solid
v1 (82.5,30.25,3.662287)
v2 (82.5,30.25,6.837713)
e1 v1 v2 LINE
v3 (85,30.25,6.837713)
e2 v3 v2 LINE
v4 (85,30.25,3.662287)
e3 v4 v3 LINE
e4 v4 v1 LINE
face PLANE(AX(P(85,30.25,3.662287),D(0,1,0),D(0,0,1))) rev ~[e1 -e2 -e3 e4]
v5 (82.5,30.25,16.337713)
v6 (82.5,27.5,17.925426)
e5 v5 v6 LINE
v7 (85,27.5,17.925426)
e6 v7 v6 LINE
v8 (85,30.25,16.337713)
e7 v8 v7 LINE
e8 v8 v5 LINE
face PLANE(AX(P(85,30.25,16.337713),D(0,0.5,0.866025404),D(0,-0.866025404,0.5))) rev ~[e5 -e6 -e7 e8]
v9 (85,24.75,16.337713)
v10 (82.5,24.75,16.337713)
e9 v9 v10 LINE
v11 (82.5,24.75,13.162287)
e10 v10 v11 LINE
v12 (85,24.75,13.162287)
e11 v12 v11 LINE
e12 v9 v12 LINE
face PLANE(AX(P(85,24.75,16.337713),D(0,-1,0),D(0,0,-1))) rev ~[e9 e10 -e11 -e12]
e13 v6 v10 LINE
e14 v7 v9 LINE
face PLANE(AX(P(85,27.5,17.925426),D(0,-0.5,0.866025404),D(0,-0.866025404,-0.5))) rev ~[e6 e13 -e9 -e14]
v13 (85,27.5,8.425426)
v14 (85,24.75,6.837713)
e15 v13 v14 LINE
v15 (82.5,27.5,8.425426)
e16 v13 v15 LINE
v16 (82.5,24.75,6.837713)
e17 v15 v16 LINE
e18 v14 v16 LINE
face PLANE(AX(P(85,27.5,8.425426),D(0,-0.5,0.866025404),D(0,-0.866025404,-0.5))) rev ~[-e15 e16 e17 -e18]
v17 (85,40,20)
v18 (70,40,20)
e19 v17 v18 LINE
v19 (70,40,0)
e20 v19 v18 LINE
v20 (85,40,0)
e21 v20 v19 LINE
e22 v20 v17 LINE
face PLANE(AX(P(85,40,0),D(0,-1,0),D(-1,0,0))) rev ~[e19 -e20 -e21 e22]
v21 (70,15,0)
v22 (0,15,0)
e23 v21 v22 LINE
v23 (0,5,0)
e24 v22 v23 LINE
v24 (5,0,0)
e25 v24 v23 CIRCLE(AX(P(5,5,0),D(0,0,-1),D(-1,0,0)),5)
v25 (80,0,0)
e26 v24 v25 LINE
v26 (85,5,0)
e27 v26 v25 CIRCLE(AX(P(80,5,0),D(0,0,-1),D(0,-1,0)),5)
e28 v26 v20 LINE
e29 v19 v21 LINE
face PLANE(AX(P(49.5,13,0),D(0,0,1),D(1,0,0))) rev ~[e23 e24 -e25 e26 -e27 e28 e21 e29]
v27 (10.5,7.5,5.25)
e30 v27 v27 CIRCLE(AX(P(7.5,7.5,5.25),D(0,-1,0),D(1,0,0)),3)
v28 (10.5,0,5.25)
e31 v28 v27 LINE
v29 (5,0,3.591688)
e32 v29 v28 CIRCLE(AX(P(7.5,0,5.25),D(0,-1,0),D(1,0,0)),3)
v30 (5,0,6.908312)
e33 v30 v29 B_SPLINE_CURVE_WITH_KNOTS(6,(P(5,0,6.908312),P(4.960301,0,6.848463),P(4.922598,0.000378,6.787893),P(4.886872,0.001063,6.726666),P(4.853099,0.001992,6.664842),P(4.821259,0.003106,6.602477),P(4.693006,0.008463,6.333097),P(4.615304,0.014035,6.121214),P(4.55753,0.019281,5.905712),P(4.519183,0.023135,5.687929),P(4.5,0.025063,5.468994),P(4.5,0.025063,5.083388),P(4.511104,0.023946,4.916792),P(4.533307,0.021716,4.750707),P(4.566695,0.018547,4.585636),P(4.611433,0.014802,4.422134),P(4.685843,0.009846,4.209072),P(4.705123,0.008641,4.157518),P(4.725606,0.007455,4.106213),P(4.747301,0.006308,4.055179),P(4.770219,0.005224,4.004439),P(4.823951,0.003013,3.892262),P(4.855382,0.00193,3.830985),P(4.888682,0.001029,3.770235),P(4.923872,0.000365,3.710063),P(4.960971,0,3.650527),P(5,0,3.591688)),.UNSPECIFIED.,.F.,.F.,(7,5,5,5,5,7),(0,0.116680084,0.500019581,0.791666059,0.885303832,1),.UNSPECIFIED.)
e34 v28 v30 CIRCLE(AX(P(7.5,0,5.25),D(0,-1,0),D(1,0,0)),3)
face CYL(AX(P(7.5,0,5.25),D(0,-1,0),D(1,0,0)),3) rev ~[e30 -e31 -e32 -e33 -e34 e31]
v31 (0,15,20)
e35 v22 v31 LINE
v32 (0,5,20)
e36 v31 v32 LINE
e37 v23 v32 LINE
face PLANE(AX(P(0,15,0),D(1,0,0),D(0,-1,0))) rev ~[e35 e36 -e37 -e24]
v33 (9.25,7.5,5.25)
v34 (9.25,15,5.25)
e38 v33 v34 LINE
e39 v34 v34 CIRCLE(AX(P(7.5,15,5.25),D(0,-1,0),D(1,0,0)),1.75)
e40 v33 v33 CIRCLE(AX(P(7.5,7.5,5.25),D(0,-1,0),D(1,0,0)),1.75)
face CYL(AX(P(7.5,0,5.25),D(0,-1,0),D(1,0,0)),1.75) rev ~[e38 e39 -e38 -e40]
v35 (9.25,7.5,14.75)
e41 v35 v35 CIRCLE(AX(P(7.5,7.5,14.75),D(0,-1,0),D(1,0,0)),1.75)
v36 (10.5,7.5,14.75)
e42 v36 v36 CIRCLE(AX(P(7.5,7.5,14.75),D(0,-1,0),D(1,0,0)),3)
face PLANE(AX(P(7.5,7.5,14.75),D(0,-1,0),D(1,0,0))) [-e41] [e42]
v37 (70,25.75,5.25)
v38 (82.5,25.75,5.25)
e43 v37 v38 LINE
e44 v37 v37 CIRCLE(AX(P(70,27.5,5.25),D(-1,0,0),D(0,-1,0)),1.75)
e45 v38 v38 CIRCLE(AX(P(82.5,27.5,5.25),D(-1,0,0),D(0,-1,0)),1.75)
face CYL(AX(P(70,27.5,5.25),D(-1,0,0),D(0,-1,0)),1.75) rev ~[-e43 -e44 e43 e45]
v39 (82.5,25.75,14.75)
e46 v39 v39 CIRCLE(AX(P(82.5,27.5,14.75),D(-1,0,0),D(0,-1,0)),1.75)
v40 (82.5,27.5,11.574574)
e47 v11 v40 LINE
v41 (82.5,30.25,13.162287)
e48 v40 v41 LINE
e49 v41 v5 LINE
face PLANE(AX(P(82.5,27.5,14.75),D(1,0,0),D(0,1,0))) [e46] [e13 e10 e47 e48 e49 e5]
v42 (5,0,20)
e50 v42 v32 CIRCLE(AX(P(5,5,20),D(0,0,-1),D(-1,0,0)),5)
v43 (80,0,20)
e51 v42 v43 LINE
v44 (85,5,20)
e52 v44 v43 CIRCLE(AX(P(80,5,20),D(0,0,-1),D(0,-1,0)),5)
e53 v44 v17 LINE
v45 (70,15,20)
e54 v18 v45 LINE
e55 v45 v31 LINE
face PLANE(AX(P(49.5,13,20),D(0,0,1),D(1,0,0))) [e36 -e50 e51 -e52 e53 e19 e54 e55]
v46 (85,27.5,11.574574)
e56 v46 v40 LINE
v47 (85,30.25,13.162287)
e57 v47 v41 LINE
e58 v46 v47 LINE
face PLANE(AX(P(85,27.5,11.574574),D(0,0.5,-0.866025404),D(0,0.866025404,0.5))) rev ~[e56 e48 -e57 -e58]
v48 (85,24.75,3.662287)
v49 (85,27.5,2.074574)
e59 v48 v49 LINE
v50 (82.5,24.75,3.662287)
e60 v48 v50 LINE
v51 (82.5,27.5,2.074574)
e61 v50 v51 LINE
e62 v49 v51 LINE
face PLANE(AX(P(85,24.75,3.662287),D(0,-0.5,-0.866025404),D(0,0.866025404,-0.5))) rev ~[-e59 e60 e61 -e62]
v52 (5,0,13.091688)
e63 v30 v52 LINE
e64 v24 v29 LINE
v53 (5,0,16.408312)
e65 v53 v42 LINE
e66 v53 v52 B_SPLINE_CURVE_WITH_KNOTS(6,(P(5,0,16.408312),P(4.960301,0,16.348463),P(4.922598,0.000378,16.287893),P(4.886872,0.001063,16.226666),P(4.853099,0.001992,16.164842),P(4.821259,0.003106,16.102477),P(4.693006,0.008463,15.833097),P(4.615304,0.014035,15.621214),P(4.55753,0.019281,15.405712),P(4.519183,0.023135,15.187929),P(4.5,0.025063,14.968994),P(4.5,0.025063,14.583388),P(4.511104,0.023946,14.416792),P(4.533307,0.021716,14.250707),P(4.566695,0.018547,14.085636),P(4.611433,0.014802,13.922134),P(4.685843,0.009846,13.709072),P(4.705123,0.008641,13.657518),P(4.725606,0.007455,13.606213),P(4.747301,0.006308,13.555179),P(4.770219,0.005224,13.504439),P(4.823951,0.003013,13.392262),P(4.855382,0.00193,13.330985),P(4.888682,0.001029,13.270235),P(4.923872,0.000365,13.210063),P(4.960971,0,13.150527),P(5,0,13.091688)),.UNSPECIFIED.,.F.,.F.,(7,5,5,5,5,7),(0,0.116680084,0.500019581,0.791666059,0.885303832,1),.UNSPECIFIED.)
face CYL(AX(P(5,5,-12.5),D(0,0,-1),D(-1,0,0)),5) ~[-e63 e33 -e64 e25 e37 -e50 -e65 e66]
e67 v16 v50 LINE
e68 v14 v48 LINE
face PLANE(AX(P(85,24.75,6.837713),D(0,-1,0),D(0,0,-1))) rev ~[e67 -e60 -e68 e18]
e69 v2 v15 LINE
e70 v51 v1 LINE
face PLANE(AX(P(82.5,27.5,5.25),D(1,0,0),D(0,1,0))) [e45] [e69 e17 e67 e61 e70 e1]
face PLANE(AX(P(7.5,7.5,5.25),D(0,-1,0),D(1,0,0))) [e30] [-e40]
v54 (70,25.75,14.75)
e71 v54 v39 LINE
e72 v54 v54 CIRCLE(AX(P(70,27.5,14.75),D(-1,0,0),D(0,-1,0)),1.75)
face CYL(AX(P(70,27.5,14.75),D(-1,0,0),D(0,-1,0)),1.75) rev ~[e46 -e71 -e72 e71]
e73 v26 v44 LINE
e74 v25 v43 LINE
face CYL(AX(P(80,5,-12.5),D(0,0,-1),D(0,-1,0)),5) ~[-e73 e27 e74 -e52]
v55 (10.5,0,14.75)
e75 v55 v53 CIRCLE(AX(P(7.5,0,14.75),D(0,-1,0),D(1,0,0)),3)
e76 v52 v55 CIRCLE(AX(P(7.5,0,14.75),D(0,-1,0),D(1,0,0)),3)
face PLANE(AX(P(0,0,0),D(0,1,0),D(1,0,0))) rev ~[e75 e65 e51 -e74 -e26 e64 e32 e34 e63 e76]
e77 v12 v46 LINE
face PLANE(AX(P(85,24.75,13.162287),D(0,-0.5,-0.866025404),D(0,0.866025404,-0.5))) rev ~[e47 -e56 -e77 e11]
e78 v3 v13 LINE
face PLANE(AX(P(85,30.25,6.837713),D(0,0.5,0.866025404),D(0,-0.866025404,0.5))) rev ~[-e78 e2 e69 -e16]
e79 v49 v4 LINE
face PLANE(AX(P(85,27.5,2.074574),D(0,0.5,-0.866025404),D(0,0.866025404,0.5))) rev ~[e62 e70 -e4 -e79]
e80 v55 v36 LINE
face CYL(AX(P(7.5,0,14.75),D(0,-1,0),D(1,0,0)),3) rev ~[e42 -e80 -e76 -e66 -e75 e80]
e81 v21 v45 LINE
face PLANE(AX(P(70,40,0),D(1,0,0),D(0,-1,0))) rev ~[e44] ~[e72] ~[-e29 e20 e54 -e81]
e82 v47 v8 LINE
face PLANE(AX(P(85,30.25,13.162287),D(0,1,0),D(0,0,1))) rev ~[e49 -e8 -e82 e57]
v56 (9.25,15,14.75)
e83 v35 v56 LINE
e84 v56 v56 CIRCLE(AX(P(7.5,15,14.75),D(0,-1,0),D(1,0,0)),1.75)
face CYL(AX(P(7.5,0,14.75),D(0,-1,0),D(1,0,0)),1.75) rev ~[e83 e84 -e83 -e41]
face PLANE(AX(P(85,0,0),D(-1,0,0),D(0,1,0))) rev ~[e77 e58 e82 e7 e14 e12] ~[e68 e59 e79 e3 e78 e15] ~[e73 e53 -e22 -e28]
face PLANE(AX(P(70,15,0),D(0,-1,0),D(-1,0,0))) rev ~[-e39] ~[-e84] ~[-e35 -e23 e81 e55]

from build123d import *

# Parameters (mm, degrees)
F1_DEPTH    = 20
F2_R        = 1.75
F3_DEPTH    = 40.001
F4_R        = 3
F5_DEPTH    = 7.5
F6_R        = 1.75
F7_DEPTH    = 15.001
F8_T1_DEPTH = 45
F10_DEPTH   = 2.5


# Not quite as in the source:
# - a fillet or chamfer that OpenCascade refuses, or shapes differently, is made with other operations: its cross-section is extruded or revolved along the edge and cut away or added


with BuildPart() as f1:
    # F0 (on Top) → F1 (new body)
    with BuildSketch(Plane.XY):
        Polygon((0, 15), (0, 0), (85, 0), (85, 40), (70, 40), (70, 15), align=None)
    extrude(amount=F1_DEPTH)

    # F2 (on face) → F3 (cut, through all)
    with BuildSketch(Plane.XZ):
        with Locations((7.5, 14.75)):
            Circle(F2_R)
        with Locations((7.5, 5.25)):
            Circle(F2_R)
    extrude(amount=-F3_DEPTH, mode=Mode.SUBTRACT)

    # F4 (on face) → F5 (cut)
    with BuildSketch(Plane.XZ):
        with Locations((7.5, 14.75)):
            Circle(F4_R)
        with Locations((7.5, 5.25)):
            Circle(F4_R)
    extrude(amount=-F5_DEPTH, mode=Mode.SUBTRACT)

    # F6 (on face) → F7 (cut, through all)
    with BuildSketch(Plane(origin=(70, 0, 0), x_dir=(0, -1, 0), z_dir=(-1, 0, 0))):
        with Locations((-27.5, 14.75)):
            Circle(F6_R)
        with Locations((-27.5, 5.25)):
            Circle(F6_R)
    extrude(amount=-F7_DEPTH, mode=Mode.SUBTRACT)

    # F8: fillet of radius 5 on 2 edges, made by hand

    # F8_s2 → F8_t1 (cut)
    with BuildSketch(Plane.XY.offset(-12.5)):
        with BuildLine():
            ThreePointArc((80, 0), (83.5355339059, 1.4644660941), (85, 5))
            Line((85, 5), (85, 0))
            Line((85, 0), (80, 0))
        make_face()
        with BuildLine():
            ThreePointArc((0, 5), (1.4644660941, 1.4644660941), (5, 0))
            Line((5, 0), (0, 0))
            Line((0, 0), (0, 5))
        make_face()
    extrude(amount=F8_T1_DEPTH, mode=Mode.SUBTRACT)

    # F9 (on face) → F10 (cut)
    with BuildSketch(Plane.YZ.offset(85)):
        Polygon((27.5, 11.5745735195), (30.25, 13.1622867597), (30.25, 16.3377132403), (27.5, 17.9254264805), (24.75, 16.3377132403), (24.75, 13.1622867597), align=None)
        Polygon((30.25, 6.8377132403), (27.5, 8.4254264805), (24.75, 6.8377132403), (24.75, 3.6622867597), (27.5, 2.0745735195), (30.25, 3.6622867597), align=None)
    extrude(amount=-F10_DEPTH, mode=Mode.SUBTRACT)


solid = f1.part
